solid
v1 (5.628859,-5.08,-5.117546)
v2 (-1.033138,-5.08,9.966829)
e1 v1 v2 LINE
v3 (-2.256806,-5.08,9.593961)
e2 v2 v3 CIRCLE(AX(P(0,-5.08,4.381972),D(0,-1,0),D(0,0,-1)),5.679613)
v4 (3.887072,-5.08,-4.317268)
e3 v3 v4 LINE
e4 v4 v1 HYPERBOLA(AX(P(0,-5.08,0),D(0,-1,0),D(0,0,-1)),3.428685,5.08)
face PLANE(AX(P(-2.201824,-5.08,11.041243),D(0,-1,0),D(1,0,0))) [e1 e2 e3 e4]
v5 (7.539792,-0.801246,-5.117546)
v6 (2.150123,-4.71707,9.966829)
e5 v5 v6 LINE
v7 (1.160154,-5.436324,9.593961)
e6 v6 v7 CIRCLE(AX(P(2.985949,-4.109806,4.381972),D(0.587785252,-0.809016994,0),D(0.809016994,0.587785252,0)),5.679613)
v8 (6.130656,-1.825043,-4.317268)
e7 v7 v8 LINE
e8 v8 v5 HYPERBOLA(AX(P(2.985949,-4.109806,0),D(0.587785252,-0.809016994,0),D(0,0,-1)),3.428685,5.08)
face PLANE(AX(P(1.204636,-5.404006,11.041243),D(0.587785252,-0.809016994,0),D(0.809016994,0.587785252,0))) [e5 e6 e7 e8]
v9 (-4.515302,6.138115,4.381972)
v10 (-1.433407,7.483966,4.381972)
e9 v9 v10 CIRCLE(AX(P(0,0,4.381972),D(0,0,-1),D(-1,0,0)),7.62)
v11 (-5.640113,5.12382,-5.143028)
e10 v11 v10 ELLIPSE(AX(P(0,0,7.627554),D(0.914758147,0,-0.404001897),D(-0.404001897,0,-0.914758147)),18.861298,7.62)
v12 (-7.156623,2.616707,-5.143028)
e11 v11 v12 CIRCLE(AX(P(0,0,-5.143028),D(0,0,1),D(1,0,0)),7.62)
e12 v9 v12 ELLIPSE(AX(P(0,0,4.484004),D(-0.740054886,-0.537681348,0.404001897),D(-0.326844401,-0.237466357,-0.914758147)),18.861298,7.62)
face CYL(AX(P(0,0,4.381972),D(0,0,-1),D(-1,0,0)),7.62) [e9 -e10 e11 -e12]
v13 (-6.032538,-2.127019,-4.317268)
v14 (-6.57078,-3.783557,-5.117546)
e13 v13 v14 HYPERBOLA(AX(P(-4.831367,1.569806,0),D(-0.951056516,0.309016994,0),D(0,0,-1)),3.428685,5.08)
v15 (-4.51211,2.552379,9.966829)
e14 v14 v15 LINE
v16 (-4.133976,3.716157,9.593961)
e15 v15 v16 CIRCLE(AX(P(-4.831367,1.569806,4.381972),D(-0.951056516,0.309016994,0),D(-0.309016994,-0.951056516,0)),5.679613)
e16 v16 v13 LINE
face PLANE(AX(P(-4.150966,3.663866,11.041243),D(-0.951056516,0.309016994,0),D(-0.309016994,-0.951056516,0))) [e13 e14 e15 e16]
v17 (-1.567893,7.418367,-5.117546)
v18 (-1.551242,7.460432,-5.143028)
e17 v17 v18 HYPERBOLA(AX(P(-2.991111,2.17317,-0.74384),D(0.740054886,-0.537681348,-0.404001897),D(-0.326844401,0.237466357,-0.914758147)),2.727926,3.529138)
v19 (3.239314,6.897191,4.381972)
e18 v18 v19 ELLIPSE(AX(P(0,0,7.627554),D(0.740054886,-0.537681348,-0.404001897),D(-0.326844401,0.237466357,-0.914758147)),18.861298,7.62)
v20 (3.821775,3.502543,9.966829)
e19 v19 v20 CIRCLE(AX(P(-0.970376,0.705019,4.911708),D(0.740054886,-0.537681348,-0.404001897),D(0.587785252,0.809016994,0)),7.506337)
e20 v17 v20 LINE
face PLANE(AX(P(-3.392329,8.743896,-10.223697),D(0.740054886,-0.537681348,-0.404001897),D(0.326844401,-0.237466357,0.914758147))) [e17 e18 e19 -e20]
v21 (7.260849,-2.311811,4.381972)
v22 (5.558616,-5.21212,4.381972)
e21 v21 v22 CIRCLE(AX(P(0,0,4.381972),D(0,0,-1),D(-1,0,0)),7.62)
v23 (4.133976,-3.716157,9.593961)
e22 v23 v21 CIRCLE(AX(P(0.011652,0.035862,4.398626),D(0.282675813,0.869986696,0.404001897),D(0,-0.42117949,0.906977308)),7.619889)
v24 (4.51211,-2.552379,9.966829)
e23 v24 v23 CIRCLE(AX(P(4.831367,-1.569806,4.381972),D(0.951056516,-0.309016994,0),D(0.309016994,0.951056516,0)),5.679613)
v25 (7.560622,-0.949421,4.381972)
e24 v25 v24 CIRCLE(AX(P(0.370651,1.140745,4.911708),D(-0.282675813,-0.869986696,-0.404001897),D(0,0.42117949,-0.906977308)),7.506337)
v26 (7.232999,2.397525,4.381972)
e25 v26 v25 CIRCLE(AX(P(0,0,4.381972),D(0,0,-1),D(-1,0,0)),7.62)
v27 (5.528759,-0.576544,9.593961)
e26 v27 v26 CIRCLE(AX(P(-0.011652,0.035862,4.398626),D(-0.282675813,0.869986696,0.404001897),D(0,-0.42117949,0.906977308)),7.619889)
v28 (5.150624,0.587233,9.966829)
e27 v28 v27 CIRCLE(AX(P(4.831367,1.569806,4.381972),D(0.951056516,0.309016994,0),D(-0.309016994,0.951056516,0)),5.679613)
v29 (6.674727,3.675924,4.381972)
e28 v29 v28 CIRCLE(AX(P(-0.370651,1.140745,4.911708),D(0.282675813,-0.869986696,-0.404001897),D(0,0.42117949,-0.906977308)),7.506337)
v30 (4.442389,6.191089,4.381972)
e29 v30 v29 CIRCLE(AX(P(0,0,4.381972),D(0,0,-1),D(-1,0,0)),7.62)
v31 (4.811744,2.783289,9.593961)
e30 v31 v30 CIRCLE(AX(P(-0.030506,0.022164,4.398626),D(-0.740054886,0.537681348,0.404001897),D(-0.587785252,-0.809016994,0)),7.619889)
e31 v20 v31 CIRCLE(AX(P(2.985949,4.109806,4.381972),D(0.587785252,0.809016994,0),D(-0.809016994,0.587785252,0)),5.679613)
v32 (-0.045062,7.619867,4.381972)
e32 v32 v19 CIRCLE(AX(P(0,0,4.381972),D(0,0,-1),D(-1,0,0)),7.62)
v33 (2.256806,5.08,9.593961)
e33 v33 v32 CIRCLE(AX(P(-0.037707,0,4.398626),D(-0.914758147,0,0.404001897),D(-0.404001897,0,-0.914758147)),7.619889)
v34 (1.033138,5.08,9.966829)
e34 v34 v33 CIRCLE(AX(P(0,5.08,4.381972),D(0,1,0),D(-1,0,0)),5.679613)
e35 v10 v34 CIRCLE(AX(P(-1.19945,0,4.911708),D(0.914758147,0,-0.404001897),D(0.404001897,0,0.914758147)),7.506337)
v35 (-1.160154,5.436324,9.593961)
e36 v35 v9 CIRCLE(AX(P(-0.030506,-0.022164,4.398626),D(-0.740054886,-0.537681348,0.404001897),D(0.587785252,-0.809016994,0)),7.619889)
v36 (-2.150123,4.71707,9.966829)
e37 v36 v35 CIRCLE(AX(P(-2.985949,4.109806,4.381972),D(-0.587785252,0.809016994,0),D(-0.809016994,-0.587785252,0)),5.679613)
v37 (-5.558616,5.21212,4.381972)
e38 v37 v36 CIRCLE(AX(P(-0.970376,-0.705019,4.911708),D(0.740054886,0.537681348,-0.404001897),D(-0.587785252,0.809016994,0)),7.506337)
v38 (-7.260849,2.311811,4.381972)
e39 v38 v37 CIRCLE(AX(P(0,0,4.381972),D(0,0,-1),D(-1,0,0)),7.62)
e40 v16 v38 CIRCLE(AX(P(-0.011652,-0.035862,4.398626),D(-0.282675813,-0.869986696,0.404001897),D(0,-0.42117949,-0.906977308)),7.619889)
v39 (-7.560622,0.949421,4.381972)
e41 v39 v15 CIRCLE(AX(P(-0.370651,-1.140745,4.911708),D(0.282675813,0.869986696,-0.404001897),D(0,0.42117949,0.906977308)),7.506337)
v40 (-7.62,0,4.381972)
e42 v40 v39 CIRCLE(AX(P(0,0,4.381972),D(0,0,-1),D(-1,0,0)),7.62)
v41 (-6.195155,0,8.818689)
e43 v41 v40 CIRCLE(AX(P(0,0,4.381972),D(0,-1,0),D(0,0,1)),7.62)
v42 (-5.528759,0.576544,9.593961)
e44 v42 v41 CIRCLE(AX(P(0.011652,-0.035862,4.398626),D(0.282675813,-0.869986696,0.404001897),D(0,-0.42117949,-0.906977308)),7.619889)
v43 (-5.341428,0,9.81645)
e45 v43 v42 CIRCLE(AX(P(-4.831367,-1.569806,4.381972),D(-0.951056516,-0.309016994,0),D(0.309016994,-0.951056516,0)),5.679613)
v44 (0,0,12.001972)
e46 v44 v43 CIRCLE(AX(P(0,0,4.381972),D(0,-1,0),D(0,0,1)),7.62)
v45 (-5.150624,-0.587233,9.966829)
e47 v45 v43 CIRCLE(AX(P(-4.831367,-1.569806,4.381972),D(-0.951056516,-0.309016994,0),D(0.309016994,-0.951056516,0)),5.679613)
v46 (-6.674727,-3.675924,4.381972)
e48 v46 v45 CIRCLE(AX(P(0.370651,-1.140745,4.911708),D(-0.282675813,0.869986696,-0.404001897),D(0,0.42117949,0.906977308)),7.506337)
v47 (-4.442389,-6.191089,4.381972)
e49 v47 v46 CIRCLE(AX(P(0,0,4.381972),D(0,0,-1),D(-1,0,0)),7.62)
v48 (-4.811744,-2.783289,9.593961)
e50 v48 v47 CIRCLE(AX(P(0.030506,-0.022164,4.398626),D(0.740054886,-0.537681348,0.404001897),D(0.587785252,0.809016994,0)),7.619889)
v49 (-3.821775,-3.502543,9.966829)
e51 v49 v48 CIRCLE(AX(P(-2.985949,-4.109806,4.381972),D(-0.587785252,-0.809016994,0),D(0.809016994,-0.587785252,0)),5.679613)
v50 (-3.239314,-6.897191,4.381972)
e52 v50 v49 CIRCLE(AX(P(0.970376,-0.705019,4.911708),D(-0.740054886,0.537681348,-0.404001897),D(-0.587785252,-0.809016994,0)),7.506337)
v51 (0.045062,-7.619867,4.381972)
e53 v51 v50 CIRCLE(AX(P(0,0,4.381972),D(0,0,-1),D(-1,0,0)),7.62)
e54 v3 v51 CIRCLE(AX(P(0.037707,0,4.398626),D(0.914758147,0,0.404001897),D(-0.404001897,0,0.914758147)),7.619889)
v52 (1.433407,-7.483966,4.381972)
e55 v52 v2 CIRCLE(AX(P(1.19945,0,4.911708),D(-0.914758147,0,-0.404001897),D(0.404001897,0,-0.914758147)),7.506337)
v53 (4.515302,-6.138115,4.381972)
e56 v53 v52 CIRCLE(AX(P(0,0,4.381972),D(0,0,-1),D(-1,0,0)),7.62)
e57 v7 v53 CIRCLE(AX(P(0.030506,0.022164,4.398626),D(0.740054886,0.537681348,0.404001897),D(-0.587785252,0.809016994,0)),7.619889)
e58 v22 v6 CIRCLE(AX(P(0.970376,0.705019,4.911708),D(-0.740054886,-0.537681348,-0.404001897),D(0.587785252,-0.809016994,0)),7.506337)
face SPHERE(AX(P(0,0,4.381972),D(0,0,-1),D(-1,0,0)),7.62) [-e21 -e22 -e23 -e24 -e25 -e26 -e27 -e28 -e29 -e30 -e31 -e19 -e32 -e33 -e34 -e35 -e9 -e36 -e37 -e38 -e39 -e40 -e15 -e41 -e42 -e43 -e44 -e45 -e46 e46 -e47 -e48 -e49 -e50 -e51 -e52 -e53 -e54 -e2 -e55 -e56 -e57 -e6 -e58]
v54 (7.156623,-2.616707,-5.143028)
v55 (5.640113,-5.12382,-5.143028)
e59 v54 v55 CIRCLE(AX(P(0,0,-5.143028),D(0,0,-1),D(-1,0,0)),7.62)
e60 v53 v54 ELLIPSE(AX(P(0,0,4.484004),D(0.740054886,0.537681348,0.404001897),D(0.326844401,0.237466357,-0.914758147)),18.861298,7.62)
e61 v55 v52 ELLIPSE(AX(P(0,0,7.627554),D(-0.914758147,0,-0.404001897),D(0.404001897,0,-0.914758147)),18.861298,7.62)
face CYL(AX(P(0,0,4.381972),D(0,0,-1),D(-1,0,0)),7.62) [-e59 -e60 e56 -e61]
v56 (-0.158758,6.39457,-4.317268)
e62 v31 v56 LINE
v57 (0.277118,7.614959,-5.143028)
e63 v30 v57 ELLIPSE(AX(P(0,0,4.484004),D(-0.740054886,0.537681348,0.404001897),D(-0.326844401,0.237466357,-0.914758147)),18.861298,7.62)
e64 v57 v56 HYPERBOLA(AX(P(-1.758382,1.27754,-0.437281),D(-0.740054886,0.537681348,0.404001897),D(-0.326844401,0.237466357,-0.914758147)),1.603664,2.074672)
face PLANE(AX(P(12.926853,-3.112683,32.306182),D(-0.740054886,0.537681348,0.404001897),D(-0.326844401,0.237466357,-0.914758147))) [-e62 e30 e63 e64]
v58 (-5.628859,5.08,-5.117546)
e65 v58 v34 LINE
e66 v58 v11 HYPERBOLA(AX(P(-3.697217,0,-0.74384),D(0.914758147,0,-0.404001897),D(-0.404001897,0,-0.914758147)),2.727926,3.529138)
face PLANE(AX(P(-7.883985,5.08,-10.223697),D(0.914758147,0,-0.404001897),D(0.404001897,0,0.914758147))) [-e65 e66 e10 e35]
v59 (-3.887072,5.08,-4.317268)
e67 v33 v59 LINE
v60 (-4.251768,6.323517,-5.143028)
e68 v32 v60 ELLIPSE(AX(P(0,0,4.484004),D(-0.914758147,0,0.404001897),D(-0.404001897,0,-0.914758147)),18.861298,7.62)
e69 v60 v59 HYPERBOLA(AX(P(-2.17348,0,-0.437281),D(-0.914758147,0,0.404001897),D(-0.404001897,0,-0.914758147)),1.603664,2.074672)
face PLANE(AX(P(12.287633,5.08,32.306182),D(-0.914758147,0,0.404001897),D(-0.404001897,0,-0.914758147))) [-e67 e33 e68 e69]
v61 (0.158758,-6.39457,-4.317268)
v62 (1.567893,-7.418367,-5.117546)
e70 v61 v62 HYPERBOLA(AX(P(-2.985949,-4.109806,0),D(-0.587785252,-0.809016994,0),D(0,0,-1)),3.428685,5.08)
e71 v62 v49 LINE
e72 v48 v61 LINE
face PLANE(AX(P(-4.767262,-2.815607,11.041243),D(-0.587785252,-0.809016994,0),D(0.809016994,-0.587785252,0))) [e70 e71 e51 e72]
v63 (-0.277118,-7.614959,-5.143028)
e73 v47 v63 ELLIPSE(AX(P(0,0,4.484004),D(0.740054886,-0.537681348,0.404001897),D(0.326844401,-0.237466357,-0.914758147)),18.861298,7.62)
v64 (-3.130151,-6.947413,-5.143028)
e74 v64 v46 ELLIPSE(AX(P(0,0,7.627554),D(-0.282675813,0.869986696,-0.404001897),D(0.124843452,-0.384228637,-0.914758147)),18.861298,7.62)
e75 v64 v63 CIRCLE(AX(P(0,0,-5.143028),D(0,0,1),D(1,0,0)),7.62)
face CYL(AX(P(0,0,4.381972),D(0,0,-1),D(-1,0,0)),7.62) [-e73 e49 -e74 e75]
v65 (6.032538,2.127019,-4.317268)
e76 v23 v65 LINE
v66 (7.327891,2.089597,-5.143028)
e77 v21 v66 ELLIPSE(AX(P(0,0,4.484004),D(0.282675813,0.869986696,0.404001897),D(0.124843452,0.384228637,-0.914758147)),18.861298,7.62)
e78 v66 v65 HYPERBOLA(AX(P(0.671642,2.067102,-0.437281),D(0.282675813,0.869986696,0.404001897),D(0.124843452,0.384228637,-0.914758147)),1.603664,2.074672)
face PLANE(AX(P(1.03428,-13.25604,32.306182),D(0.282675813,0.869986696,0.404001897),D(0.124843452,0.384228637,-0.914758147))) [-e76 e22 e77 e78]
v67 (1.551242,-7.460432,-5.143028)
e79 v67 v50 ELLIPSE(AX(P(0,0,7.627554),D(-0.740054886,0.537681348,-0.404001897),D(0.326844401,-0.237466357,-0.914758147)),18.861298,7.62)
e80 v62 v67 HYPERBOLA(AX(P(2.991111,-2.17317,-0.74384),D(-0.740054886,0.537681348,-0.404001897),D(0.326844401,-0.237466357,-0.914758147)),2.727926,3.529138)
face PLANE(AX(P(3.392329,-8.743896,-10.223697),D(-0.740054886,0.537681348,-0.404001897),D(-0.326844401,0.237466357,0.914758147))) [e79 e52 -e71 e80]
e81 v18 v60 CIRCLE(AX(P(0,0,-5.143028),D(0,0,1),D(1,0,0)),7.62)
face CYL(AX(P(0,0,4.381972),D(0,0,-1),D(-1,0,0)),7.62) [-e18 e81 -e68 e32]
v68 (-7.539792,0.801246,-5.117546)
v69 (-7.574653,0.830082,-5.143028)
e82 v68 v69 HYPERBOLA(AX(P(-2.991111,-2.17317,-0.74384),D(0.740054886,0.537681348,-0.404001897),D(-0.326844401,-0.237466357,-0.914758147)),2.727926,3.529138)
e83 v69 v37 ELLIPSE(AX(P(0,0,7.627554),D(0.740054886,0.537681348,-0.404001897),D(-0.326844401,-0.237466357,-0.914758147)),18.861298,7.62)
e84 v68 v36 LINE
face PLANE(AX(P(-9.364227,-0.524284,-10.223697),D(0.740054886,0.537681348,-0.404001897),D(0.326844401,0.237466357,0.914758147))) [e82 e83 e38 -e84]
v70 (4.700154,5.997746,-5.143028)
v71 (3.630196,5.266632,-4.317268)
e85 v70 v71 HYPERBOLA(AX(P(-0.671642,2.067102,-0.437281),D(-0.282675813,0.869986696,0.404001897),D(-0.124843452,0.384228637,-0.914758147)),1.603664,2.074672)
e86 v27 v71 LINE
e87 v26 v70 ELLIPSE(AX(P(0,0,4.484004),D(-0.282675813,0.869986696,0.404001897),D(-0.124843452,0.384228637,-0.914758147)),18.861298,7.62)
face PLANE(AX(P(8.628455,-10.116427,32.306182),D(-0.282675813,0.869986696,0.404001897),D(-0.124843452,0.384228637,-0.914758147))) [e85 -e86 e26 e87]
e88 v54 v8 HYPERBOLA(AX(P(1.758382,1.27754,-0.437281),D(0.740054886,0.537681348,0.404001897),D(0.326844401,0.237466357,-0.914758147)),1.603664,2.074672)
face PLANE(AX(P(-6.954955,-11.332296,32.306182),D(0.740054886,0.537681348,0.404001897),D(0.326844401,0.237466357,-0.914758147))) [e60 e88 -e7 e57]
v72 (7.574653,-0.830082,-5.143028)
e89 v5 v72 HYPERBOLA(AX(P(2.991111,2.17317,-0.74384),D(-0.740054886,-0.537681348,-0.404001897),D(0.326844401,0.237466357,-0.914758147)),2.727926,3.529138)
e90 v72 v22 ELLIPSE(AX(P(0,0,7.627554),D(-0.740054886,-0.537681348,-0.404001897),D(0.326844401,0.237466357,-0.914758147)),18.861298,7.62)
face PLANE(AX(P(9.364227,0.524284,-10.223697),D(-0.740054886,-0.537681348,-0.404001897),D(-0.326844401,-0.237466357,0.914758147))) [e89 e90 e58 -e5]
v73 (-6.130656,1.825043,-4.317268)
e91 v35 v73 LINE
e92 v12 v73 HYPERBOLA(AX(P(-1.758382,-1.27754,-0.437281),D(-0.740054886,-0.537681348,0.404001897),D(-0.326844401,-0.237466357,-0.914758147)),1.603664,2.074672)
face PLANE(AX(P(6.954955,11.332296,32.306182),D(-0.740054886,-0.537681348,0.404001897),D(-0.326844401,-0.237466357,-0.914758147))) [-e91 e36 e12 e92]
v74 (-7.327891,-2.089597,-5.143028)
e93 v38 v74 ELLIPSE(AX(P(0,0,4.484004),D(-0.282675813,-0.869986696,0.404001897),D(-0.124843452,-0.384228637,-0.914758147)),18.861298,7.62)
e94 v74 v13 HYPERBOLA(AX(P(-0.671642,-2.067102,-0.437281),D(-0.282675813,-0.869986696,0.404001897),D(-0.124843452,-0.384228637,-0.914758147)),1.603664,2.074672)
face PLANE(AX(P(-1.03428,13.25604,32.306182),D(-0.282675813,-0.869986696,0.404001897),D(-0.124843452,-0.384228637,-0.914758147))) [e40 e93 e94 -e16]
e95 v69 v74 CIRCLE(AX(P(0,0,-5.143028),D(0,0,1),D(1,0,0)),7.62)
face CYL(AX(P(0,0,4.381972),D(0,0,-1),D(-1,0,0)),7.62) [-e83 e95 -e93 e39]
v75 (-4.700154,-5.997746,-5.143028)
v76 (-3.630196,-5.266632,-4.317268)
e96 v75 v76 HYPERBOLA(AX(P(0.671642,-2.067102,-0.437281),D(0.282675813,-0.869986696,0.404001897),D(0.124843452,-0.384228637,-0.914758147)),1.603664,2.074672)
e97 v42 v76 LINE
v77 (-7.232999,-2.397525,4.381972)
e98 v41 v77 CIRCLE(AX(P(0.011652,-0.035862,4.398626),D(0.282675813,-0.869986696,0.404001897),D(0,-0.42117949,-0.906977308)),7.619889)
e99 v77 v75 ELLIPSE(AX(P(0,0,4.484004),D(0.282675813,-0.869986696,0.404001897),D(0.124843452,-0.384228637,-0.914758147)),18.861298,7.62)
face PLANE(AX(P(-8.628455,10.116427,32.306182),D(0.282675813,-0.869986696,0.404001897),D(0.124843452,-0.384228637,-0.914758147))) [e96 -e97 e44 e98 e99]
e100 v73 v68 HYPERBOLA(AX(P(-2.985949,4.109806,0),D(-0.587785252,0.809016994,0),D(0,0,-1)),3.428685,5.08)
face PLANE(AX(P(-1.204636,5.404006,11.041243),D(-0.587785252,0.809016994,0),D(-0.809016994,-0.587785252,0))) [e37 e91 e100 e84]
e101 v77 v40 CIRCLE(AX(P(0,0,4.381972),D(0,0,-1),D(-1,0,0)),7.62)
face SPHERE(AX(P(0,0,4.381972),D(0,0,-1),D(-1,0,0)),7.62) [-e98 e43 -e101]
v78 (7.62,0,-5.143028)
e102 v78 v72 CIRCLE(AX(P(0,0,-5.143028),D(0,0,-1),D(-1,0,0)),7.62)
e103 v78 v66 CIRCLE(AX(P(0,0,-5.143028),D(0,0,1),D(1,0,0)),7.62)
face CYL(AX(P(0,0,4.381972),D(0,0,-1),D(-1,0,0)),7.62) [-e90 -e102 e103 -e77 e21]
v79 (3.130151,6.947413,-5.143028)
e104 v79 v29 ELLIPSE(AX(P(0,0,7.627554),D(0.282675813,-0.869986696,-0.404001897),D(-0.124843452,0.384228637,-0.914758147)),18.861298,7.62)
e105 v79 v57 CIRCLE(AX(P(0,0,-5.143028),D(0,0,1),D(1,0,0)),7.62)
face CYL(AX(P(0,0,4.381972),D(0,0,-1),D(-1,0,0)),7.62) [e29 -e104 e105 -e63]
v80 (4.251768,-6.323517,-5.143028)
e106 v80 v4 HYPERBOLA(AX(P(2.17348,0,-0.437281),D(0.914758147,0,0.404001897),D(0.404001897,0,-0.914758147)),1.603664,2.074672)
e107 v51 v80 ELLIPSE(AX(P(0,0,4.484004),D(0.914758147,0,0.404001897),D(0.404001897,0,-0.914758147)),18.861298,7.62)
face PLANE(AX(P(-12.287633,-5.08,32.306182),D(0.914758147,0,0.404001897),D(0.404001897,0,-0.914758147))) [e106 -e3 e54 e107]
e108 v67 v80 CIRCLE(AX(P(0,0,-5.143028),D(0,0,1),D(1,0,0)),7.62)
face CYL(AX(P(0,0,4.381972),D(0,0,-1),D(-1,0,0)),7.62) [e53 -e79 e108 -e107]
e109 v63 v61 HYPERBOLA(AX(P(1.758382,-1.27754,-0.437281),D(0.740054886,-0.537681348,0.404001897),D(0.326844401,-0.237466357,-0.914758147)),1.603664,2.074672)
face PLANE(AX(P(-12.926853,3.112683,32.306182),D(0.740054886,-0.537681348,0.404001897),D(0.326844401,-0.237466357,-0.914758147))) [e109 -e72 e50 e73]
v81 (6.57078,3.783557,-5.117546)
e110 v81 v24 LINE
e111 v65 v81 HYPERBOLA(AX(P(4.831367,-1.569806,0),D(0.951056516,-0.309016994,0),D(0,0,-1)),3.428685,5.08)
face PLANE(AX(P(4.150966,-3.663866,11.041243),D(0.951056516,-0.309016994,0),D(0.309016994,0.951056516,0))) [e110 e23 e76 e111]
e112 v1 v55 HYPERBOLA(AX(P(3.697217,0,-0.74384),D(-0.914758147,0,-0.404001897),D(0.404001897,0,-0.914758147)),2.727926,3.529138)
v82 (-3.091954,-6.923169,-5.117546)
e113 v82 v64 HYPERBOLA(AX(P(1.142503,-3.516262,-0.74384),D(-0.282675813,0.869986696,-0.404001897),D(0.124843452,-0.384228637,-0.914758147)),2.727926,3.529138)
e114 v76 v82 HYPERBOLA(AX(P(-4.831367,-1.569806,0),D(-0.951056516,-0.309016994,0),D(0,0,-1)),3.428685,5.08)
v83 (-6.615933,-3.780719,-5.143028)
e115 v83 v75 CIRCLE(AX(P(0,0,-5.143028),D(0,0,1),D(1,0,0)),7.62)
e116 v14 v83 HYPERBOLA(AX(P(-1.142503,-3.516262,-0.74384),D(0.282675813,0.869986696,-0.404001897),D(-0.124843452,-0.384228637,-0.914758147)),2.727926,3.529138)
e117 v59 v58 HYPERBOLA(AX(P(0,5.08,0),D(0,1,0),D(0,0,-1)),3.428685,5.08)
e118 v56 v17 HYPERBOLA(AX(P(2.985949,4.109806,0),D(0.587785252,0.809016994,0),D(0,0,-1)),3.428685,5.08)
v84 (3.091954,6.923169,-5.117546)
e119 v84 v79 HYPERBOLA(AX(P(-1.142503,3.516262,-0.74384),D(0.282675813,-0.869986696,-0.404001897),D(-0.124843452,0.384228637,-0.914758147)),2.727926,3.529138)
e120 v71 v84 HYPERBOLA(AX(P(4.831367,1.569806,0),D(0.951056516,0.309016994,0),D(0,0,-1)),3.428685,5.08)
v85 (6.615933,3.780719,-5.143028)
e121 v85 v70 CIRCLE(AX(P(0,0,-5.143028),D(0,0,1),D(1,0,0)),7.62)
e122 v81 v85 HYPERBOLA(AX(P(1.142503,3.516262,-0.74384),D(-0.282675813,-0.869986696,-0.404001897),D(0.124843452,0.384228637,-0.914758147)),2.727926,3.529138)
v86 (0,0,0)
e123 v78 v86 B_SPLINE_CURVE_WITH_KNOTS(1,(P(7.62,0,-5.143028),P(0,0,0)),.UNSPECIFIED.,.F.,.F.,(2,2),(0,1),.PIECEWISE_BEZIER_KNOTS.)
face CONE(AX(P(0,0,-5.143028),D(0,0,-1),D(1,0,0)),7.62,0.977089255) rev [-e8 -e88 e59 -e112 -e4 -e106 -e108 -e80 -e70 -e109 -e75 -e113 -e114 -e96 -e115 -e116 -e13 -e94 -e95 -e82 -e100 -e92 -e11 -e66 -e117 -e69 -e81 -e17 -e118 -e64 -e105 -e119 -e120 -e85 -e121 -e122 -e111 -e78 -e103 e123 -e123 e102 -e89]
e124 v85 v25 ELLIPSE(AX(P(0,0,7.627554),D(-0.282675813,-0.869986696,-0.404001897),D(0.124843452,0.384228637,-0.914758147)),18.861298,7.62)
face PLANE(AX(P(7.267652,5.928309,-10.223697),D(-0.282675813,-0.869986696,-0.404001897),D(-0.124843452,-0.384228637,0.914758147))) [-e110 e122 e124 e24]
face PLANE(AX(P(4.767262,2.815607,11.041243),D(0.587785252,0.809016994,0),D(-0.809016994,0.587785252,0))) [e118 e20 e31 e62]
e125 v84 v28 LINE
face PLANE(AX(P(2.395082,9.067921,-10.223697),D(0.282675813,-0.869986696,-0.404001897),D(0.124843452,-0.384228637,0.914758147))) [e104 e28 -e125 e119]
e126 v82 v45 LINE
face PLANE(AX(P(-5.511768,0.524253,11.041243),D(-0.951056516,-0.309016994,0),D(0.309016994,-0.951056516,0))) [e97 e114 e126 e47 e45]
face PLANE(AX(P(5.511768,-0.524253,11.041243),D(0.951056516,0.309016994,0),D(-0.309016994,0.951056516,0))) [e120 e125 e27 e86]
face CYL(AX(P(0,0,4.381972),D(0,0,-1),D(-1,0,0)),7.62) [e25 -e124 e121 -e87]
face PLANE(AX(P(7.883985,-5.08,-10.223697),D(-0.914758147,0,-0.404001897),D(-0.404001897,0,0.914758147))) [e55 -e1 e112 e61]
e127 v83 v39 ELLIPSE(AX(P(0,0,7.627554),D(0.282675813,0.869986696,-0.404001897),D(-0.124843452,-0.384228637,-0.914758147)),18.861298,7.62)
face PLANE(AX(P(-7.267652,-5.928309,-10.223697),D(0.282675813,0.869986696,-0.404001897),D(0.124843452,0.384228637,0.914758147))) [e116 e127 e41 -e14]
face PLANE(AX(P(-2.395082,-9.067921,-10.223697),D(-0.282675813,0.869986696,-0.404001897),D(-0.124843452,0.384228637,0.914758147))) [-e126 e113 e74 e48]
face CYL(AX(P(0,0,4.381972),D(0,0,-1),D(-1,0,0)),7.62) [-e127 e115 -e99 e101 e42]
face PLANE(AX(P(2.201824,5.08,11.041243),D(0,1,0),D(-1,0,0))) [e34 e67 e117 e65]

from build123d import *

# Parameters (mm, degrees)
F1_FACE_R       = 7.62
F5_DEPTH        = 25.4
F5_COPIES_COUNT = 10


# Not quite as in the source:
# - a pattern or mirror of a feature is missing from the dataset's text; its kind, count and spacing are read off the source's solid


with BuildPart() as f1:
    # F0 (on Front) → F1 (revolve)
    with BuildSketch(Plane.XZ):
        with BuildLine():
            Line((-7.62, 4.3819724477), (-7.62, -5.1430275523))
            Line((-7.62, -5.1430275523), (0, -5.1430275523))
            Line((0, -5.1430275523), (0, 12.0019724477))
            ThreePointArc((0, 12.0019724477), (-5.3881536726, 9.7701261203), (-7.62, 4.3819724477))
        make_face()
    revolve(axis=Axis((0, 0, 3.4294724477), (0, 0, -1)))

    # F1_face (on face) → F2 section 0
    with BuildSketch(Plane(origin=(0, 0, -5.1430275523), x_dir=(1, 0, 0), z_dir=(0, 0, -1)), mode=Mode.PRIVATE) as f2_s0:
        Circle(F1_FACE_R)
    loft([f2_s0.sketch, Vertex(0, 0, 0)], mode=Mode.SUBTRACT)

    # F4 (on offset) → F5 (cut)
    with BuildSketch(Plane.XZ.offset(5.08)):
        Polygon((6.7222419615, -10.7367794649), (7.8839848078, -10.2236970553), (-11.1258903258, 32.8192645344), (-12.2876331722, 32.3061821249), align=None)
    f5 = extrude(amount=F5_DEPTH, mode=Mode.SUBTRACT)

    # F5_copies: F5 ×10 about axis
    f5_copies_axis = Axis((0, 0, 0), (0, 0, 1))
    for i in range(1, F5_COPIES_COUNT):
        add(f5.rotate(f5_copies_axis, i * 360 / F5_COPIES_COUNT), mode=Mode.SUBTRACT)


solid = f1.part
